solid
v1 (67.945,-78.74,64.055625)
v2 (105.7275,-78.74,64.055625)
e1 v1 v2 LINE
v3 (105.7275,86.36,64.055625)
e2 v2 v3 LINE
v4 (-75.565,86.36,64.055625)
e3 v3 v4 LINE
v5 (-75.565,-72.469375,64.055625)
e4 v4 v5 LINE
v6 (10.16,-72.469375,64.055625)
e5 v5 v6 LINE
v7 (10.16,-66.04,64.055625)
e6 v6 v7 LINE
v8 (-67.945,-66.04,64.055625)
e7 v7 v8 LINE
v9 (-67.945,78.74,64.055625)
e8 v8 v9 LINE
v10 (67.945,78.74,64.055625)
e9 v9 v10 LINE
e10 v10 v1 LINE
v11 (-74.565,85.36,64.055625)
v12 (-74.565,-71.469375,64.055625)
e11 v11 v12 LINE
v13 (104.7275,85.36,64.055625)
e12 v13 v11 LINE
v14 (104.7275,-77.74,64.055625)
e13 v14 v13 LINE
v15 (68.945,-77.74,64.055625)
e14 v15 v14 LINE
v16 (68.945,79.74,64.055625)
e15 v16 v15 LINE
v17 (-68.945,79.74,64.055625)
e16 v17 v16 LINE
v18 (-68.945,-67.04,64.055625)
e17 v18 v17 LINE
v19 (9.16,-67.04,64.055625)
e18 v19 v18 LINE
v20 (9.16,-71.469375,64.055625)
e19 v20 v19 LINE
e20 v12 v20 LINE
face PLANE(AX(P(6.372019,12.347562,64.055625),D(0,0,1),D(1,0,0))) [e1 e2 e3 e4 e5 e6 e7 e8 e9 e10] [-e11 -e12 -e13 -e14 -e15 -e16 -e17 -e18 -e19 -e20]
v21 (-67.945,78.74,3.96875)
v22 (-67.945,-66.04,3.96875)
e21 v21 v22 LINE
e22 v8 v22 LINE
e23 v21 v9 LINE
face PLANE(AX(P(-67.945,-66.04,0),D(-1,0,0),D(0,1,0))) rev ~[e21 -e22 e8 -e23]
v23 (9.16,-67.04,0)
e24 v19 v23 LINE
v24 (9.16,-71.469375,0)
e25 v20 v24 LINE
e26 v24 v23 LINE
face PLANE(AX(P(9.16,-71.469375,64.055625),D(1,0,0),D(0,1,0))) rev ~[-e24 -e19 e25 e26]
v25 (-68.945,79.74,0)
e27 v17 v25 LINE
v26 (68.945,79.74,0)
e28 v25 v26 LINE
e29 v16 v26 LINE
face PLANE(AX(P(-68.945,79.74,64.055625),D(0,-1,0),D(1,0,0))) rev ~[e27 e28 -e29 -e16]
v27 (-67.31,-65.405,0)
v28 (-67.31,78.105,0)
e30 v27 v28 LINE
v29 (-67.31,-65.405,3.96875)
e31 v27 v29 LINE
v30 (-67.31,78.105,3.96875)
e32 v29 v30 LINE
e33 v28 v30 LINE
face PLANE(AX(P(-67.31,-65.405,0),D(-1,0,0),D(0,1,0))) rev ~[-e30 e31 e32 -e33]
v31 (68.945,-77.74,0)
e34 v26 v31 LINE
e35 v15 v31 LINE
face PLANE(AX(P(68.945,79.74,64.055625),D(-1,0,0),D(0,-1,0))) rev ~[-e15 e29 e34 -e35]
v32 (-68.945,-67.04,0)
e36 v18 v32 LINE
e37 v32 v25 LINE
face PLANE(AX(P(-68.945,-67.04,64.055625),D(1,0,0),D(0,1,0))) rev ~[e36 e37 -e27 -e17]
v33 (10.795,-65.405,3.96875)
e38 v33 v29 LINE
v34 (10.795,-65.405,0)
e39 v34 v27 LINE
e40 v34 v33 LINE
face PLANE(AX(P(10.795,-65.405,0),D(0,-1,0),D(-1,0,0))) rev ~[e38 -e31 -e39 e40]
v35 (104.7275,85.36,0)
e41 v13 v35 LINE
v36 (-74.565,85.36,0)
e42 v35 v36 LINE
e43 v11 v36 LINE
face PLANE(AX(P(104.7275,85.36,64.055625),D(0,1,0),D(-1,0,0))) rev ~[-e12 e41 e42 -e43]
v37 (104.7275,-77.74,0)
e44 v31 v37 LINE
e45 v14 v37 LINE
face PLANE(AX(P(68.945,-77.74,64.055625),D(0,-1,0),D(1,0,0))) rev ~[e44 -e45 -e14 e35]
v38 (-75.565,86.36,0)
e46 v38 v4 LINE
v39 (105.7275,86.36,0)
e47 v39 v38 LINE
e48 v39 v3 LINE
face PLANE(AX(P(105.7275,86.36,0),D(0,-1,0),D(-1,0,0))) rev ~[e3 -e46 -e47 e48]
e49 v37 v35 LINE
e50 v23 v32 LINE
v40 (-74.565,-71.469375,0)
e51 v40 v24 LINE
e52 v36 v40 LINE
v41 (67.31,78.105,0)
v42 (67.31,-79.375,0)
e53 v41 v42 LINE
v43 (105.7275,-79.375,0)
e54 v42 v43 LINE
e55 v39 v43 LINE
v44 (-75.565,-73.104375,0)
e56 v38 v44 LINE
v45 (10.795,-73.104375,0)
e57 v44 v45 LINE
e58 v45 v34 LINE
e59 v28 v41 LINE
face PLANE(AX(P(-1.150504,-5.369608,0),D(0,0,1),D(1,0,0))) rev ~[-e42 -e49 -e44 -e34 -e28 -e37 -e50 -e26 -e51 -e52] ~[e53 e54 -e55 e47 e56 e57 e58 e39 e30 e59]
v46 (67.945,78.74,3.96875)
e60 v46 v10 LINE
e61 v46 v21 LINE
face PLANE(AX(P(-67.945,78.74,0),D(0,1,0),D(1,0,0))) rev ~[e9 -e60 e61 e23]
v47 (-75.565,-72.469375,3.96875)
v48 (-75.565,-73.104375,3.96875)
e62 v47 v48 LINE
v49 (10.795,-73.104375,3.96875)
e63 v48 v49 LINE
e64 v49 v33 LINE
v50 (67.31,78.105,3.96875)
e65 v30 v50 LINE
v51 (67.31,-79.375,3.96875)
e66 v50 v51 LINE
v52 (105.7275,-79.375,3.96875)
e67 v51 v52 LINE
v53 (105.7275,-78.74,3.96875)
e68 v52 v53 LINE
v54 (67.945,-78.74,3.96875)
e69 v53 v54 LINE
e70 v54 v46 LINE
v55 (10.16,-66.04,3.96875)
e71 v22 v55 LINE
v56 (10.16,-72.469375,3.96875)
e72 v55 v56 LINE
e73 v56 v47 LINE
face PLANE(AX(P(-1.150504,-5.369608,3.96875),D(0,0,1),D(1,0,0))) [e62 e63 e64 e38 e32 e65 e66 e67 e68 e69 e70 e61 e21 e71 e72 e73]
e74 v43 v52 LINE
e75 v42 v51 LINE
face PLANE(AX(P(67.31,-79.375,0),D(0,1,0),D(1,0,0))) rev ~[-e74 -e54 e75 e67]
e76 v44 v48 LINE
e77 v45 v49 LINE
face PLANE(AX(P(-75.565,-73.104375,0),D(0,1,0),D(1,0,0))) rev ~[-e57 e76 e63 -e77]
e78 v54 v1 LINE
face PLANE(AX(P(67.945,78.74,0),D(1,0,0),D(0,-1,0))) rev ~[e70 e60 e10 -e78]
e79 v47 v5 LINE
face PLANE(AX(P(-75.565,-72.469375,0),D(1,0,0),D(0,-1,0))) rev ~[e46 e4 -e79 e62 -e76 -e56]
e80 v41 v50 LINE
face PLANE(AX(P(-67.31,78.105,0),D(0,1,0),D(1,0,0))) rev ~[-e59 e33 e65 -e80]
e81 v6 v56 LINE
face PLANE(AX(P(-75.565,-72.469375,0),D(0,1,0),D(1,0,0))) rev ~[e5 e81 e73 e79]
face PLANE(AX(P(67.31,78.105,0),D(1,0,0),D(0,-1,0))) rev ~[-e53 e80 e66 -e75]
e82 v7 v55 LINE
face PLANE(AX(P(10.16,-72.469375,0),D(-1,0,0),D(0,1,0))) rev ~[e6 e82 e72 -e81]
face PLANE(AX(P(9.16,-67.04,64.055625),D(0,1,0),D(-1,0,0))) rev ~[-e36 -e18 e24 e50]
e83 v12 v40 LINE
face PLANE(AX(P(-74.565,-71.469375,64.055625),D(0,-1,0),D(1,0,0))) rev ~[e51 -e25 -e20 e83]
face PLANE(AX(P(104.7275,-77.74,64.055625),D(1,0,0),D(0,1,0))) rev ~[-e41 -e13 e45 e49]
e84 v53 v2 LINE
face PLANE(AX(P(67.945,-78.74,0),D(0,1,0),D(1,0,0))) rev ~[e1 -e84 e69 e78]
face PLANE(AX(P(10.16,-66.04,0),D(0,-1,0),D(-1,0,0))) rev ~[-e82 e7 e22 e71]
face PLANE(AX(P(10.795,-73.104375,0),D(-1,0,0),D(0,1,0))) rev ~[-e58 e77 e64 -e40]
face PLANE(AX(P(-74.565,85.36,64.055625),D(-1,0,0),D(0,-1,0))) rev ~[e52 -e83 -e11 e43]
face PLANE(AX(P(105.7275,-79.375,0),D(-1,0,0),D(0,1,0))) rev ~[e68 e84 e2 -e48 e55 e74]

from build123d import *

# Parameters (mm, degrees)
F2_DEPTH = 0.6
F3_DEPTH = 1281.1125
F5_DEPTH = 79.375
F6_SCALE = 0.05
F8_DEPTH = 64.055625


with BuildPart() as f2:
    # F1 (on Top) → F2 (new body)
    with BuildSketch(Plane.XY):
        Polygon((-1358.9, -1320.8), (-1358.9, 1574.8), (1358.9, 1574.8), (1358.9, -1574.8), (2114.55, -1574.8), (2114.55, 1727.2), (-1511.3, 1727.2), (-1511.3, -1449.3875), (-1358.9, -1449.3875), (203.2, -1449.3875), (203.2, -1320.8), align=None)
    extrude(amount=F2_DEPTH)

    # F1 (on Top) → F3 (join)
    with BuildSketch(Plane.XY):
        Polygon((-1358.9, -1320.8), (-1358.9, 1574.8), (1358.9, 1574.8), (1358.9, -1574.8), (2114.55, -1574.8), (2114.55, 1727.2), (-1511.3, 1727.2), (-1511.3, -1449.3875), (-1358.9, -1449.3875), (203.2, -1449.3875), (203.2, -1320.8), align=None)
    extrude(amount=F3_DEPTH)

    # F4 (on Top) → F5 (join)
    with BuildSketch(Plane.XY):
        Polygon((203.2, -1320.8), (203.2, -1449.3875), (-1511.3, -1449.3875), (-1511.3, -1462.0875), (215.9, -1462.0875), (215.9, -1308.1), (-1346.2, -1308.1), (-1346.2, 1562.1), (1346.2, 1562.1), (1346.2, -1587.5), (2114.55, -1587.5), (2114.55, -1574.8), (1358.9, -1574.8), (1358.9, 1574.8), (-1358.9, 1574.8), (-1358.9, -1320.8), align=None)
    extrude(amount=F5_DEPTH)


with BuildPart() as f2_1:
    # F6: moved
    add(f2.part.scale(F6_SCALE))

    # F7 (on face) → F8 (cut, through all)
    with BuildSketch(Plane.XY.offset(64.055625)):
        Polygon((-68.945, -67.04), (-68.945, 79.74), (68.945, 79.74), (68.945, -77.74), (104.7275, -77.74), (104.7275, 85.36), (-74.565, 85.36), (-74.565, -71.469375), (9.16, -71.469375), (9.16, -67.04), align=None)
    extrude(amount=-F8_DEPTH, mode=Mode.SUBTRACT)


solid = f2_1.part
